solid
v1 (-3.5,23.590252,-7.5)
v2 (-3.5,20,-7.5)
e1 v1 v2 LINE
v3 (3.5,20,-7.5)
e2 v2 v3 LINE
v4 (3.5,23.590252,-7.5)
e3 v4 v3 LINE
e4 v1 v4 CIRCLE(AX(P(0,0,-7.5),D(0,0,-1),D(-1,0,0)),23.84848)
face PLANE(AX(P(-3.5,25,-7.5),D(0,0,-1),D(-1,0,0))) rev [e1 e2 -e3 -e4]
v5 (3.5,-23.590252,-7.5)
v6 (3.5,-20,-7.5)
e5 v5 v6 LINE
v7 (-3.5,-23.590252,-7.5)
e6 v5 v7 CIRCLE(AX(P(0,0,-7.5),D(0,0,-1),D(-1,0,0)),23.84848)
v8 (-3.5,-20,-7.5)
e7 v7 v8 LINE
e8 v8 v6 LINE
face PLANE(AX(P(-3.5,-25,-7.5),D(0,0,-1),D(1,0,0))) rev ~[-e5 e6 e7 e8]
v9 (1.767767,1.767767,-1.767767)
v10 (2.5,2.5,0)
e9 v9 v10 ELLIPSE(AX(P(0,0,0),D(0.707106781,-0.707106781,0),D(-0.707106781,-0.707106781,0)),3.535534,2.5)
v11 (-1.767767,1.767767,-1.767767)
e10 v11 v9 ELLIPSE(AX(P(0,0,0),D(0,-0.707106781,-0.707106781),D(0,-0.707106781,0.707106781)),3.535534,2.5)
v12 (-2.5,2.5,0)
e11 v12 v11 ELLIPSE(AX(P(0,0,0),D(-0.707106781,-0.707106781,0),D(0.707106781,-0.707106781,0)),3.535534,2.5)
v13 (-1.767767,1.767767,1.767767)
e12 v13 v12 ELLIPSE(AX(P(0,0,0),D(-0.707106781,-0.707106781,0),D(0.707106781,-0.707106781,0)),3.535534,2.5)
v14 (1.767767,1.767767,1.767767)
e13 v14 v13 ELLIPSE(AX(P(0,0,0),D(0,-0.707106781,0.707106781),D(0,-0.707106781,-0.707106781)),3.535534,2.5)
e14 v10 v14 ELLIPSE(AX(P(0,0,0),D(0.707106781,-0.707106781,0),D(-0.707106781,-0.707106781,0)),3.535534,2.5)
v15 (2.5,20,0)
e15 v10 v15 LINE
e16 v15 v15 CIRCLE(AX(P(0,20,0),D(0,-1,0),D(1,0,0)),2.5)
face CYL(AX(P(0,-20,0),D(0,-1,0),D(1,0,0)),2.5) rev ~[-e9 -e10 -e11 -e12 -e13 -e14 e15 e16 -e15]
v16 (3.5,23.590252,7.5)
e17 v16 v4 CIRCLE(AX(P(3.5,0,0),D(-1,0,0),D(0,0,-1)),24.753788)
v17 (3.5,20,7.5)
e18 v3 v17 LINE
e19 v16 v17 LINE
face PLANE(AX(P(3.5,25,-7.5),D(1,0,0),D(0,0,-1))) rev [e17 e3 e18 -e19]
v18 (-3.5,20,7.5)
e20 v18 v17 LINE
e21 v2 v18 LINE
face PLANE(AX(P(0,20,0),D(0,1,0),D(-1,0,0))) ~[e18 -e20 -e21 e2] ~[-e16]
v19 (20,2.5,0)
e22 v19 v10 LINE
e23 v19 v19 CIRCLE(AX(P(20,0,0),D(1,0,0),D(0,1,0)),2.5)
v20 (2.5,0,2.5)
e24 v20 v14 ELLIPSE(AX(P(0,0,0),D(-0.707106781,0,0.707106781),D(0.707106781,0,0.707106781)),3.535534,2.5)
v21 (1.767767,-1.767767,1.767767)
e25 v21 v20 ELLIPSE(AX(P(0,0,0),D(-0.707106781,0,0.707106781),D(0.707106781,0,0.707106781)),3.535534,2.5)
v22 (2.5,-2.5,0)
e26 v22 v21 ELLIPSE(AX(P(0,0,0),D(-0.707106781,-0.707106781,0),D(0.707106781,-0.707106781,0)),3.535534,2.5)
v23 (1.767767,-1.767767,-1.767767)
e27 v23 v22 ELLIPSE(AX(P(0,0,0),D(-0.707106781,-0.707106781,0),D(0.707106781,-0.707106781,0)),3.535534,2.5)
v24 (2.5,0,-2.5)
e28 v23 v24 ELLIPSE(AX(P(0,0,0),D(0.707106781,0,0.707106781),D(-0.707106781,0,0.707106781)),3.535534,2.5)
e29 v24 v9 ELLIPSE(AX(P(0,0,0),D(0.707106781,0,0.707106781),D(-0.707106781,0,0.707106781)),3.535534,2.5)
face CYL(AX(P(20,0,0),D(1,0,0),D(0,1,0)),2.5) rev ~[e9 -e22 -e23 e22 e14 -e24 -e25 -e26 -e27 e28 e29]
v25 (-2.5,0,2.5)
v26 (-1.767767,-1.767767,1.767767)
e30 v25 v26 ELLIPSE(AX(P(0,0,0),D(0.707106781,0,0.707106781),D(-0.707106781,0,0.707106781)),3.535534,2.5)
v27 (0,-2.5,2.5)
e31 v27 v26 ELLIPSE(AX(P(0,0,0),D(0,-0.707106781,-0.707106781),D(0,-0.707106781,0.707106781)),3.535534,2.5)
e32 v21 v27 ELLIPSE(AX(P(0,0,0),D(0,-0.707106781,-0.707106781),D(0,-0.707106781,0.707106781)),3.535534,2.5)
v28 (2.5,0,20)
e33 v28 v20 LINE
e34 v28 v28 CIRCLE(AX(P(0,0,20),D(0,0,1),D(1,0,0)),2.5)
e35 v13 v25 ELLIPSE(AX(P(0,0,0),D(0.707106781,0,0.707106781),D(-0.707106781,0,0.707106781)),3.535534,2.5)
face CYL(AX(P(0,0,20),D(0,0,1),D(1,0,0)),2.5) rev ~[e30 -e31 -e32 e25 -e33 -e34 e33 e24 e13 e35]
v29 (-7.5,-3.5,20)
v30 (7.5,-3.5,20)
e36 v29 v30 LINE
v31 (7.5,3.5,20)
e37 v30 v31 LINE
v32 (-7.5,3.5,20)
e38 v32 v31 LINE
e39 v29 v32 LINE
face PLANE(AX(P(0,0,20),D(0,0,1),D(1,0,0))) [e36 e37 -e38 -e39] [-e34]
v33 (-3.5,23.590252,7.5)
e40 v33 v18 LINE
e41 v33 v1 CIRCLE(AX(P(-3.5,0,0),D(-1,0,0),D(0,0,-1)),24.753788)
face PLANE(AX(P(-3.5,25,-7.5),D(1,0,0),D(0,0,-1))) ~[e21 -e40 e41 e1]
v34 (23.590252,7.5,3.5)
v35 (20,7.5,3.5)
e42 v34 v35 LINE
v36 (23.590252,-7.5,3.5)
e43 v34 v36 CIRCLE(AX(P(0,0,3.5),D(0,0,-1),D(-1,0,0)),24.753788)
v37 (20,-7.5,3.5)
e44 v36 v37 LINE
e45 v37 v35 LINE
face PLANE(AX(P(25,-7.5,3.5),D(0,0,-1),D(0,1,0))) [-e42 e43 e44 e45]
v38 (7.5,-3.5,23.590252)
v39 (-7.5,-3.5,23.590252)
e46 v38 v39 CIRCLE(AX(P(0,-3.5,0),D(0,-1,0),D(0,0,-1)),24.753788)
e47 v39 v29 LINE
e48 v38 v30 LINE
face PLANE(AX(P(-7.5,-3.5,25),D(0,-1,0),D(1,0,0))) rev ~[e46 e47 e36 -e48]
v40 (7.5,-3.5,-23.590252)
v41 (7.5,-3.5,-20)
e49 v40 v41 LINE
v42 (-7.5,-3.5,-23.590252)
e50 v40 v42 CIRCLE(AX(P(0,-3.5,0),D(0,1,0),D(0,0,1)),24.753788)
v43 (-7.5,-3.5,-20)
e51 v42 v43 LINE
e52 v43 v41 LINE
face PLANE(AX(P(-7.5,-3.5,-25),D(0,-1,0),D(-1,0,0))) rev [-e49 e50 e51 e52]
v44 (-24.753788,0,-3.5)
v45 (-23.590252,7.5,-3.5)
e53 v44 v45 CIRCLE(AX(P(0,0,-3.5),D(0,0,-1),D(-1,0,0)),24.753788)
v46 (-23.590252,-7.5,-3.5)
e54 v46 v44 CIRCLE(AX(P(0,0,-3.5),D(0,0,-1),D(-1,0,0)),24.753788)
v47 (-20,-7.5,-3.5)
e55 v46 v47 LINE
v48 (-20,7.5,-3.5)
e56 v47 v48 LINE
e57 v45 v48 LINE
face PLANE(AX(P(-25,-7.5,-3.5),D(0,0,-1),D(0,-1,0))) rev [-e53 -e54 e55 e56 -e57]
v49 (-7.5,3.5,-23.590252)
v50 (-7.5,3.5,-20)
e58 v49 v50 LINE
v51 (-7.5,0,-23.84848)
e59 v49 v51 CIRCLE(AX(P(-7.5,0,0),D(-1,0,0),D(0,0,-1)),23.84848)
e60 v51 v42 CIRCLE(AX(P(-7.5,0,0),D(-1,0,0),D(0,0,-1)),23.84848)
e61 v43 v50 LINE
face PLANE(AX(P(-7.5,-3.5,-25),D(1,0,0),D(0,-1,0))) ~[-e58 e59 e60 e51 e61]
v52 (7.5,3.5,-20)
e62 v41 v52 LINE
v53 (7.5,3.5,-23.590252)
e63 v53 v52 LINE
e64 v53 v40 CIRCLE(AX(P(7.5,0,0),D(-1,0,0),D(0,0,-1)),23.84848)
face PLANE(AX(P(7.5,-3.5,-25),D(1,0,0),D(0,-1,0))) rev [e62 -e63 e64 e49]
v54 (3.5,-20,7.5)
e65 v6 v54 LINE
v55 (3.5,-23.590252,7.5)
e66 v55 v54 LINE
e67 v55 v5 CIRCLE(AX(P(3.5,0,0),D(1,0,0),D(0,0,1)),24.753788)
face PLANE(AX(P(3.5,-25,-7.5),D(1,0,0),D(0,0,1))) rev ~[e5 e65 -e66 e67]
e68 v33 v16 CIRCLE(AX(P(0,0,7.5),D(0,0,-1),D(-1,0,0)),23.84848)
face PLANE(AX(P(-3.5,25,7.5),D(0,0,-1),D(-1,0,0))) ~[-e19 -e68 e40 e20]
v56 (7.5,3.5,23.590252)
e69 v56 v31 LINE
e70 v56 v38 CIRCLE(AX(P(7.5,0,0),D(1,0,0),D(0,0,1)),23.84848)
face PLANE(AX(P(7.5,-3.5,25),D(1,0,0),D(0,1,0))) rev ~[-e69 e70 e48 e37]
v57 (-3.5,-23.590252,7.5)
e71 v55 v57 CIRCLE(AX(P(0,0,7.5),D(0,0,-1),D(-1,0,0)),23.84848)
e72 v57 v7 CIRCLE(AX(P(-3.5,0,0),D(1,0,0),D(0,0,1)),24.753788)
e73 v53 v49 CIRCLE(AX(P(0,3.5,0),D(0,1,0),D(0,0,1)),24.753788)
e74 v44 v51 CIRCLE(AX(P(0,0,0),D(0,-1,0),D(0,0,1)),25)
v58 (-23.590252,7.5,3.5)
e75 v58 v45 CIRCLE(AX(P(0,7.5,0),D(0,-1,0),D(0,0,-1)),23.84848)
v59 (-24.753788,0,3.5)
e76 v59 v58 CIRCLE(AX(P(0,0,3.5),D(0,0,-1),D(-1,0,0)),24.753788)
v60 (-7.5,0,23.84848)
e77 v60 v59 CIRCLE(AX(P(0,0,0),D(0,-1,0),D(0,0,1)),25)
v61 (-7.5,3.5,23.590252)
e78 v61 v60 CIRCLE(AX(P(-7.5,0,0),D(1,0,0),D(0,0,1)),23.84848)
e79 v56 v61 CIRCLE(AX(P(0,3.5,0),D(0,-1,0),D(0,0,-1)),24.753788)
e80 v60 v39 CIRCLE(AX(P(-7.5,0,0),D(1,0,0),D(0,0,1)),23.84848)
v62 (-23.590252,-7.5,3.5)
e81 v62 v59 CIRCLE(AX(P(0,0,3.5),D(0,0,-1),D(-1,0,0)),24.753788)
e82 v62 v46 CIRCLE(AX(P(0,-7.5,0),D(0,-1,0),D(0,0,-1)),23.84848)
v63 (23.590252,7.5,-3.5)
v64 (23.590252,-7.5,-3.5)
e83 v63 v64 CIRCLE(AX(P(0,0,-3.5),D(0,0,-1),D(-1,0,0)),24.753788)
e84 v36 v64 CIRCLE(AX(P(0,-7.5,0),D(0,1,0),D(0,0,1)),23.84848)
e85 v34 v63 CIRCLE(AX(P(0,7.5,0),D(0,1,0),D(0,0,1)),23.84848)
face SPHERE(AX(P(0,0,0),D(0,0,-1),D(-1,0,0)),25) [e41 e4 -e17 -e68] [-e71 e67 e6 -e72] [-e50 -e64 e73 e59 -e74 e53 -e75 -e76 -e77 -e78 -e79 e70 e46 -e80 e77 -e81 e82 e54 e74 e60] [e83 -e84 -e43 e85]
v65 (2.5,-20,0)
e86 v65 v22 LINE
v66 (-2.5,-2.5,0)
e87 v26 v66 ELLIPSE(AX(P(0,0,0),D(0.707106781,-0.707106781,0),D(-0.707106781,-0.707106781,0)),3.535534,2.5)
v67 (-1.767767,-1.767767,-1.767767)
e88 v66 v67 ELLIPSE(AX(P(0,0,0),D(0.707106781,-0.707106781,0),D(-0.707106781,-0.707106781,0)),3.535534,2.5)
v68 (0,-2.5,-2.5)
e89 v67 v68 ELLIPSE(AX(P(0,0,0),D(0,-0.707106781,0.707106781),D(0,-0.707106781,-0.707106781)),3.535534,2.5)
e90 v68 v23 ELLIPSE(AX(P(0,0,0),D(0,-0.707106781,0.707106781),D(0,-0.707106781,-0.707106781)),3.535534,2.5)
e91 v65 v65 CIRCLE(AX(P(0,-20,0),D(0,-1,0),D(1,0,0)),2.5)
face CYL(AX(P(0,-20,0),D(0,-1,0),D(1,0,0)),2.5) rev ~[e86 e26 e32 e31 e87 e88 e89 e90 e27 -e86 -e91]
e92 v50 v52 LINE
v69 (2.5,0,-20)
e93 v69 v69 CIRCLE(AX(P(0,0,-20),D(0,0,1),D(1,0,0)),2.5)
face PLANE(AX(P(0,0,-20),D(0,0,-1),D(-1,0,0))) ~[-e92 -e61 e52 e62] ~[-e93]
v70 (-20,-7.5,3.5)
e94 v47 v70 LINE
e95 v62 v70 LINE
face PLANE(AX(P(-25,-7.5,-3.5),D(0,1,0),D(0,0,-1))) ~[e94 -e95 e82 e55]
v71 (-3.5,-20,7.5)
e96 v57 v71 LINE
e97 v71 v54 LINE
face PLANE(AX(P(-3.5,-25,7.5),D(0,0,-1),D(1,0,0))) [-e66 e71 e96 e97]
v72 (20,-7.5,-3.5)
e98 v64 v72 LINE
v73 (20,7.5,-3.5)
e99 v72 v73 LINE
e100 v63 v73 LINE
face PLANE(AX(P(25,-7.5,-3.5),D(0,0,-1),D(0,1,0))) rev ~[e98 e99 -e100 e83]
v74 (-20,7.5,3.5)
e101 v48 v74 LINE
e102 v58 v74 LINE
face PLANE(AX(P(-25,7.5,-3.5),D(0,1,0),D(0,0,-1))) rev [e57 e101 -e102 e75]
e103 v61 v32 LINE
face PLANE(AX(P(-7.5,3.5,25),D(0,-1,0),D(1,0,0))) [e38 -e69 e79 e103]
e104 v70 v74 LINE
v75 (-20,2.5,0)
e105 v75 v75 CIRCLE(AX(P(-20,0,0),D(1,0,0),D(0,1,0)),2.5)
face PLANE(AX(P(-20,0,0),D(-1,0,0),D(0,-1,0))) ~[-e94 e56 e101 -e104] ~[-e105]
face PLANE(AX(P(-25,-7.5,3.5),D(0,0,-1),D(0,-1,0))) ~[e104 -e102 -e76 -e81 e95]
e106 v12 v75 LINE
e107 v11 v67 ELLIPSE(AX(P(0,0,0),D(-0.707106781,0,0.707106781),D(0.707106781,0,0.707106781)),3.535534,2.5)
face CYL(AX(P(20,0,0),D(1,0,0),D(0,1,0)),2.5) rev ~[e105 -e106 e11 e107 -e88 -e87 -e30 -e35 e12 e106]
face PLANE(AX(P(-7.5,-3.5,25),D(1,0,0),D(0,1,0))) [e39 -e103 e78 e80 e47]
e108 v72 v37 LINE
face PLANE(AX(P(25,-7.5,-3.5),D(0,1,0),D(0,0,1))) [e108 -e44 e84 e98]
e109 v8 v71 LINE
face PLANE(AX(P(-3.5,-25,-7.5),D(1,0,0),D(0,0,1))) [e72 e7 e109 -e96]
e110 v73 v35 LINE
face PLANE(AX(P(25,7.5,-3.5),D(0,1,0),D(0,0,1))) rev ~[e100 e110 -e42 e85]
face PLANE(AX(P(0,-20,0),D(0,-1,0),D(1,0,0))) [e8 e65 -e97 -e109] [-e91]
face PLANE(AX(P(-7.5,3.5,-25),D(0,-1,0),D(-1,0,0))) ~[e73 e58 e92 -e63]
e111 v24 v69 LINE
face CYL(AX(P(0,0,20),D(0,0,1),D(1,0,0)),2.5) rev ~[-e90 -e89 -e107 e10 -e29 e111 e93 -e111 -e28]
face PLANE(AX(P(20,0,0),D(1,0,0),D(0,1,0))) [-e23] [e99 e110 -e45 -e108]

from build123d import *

# Parameters (mm, degrees)
F3_W      = 7
F3_H      = 15
F4_DEPTH  = 5
F5_R      = 2.5
F6_DEPTH  = 45.001
F8_W      = 15
F8_H      = 7
F9_DEPTH  = 5
F10_R     = 2.5
F11_DEPTH = 44.754787589
F13_W     = 15
F13_H     = 7
F14_DEPTH = 5
F15_R     = 2.5
F16_DEPTH = 44.754787589


# Not quite as in the source:
# - a pattern or mirror of a feature is missing from the dataset's text; its kind, count and spacing are read off the source's solid


with BuildPart() as f1:
    # F0 (on Front) → F1 (revolve)
    with BuildSketch(Plane.XZ):
        with BuildLine():
            Line((0, -25), (0, 25))
            ThreePointArc((0, 25), (-25, 0), (0, -25))
        make_face()
    revolve(axis=Axis((0, 0, 0), (0, 0, -1)))

    # F3 (on offset) → F4 (cut)
    with BuildSketch(Plane.XZ.offset(25)):
        Rectangle(F3_W, F3_H)
    f4 = extrude(amount=-F4_DEPTH, mode=Mode.SUBTRACT)

    # F4_copies: F4 across plane
    add(f4.mirror(Plane.ZX), mode=Mode.SUBTRACT)

    # F5 (on face) → F6 (cut, through all)
    with BuildSketch(Plane.XZ.offset(20)):
        Circle(F5_R)
    extrude(amount=-F6_DEPTH, mode=Mode.SUBTRACT)

    # F8 (on offset) → F9 (cut)
    with BuildSketch(Plane.XY.offset(25)):
        Rectangle(F8_W, F8_H)
    f9 = extrude(amount=-F9_DEPTH, mode=Mode.SUBTRACT)

    # F9_copies: F9 across plane
    add(f9.mirror(Plane(origin=(0, 0, 0), x_dir=(-1, 0, 0), z_dir=(0, 0, -1))), mode=Mode.SUBTRACT)

    # F10 (on face) → F11 (cut, through all)
    with BuildSketch(Plane.XY.offset(20)):
        Circle(F10_R)
    extrude(amount=-F11_DEPTH, mode=Mode.SUBTRACT)

    # F13 (on offset) → F14 (cut)
    with BuildSketch(Plane.YZ.offset(25)):
        Rectangle(F13_W, F13_H)
    f14 = extrude(amount=-F14_DEPTH, mode=Mode.SUBTRACT)

    # F14_copies: F14 across plane
    add(f14.mirror(Plane(origin=(0, 0, 0), x_dir=(0, 0, -1), z_dir=(-1, 0, 0))), mode=Mode.SUBTRACT)

    # F15 (on face) → F16 (cut, through all)
    with BuildSketch(Plane.YZ.offset(20)):
        Circle(F15_R)
    extrude(amount=-F16_DEPTH, mode=Mode.SUBTRACT)


solid = f1.part
